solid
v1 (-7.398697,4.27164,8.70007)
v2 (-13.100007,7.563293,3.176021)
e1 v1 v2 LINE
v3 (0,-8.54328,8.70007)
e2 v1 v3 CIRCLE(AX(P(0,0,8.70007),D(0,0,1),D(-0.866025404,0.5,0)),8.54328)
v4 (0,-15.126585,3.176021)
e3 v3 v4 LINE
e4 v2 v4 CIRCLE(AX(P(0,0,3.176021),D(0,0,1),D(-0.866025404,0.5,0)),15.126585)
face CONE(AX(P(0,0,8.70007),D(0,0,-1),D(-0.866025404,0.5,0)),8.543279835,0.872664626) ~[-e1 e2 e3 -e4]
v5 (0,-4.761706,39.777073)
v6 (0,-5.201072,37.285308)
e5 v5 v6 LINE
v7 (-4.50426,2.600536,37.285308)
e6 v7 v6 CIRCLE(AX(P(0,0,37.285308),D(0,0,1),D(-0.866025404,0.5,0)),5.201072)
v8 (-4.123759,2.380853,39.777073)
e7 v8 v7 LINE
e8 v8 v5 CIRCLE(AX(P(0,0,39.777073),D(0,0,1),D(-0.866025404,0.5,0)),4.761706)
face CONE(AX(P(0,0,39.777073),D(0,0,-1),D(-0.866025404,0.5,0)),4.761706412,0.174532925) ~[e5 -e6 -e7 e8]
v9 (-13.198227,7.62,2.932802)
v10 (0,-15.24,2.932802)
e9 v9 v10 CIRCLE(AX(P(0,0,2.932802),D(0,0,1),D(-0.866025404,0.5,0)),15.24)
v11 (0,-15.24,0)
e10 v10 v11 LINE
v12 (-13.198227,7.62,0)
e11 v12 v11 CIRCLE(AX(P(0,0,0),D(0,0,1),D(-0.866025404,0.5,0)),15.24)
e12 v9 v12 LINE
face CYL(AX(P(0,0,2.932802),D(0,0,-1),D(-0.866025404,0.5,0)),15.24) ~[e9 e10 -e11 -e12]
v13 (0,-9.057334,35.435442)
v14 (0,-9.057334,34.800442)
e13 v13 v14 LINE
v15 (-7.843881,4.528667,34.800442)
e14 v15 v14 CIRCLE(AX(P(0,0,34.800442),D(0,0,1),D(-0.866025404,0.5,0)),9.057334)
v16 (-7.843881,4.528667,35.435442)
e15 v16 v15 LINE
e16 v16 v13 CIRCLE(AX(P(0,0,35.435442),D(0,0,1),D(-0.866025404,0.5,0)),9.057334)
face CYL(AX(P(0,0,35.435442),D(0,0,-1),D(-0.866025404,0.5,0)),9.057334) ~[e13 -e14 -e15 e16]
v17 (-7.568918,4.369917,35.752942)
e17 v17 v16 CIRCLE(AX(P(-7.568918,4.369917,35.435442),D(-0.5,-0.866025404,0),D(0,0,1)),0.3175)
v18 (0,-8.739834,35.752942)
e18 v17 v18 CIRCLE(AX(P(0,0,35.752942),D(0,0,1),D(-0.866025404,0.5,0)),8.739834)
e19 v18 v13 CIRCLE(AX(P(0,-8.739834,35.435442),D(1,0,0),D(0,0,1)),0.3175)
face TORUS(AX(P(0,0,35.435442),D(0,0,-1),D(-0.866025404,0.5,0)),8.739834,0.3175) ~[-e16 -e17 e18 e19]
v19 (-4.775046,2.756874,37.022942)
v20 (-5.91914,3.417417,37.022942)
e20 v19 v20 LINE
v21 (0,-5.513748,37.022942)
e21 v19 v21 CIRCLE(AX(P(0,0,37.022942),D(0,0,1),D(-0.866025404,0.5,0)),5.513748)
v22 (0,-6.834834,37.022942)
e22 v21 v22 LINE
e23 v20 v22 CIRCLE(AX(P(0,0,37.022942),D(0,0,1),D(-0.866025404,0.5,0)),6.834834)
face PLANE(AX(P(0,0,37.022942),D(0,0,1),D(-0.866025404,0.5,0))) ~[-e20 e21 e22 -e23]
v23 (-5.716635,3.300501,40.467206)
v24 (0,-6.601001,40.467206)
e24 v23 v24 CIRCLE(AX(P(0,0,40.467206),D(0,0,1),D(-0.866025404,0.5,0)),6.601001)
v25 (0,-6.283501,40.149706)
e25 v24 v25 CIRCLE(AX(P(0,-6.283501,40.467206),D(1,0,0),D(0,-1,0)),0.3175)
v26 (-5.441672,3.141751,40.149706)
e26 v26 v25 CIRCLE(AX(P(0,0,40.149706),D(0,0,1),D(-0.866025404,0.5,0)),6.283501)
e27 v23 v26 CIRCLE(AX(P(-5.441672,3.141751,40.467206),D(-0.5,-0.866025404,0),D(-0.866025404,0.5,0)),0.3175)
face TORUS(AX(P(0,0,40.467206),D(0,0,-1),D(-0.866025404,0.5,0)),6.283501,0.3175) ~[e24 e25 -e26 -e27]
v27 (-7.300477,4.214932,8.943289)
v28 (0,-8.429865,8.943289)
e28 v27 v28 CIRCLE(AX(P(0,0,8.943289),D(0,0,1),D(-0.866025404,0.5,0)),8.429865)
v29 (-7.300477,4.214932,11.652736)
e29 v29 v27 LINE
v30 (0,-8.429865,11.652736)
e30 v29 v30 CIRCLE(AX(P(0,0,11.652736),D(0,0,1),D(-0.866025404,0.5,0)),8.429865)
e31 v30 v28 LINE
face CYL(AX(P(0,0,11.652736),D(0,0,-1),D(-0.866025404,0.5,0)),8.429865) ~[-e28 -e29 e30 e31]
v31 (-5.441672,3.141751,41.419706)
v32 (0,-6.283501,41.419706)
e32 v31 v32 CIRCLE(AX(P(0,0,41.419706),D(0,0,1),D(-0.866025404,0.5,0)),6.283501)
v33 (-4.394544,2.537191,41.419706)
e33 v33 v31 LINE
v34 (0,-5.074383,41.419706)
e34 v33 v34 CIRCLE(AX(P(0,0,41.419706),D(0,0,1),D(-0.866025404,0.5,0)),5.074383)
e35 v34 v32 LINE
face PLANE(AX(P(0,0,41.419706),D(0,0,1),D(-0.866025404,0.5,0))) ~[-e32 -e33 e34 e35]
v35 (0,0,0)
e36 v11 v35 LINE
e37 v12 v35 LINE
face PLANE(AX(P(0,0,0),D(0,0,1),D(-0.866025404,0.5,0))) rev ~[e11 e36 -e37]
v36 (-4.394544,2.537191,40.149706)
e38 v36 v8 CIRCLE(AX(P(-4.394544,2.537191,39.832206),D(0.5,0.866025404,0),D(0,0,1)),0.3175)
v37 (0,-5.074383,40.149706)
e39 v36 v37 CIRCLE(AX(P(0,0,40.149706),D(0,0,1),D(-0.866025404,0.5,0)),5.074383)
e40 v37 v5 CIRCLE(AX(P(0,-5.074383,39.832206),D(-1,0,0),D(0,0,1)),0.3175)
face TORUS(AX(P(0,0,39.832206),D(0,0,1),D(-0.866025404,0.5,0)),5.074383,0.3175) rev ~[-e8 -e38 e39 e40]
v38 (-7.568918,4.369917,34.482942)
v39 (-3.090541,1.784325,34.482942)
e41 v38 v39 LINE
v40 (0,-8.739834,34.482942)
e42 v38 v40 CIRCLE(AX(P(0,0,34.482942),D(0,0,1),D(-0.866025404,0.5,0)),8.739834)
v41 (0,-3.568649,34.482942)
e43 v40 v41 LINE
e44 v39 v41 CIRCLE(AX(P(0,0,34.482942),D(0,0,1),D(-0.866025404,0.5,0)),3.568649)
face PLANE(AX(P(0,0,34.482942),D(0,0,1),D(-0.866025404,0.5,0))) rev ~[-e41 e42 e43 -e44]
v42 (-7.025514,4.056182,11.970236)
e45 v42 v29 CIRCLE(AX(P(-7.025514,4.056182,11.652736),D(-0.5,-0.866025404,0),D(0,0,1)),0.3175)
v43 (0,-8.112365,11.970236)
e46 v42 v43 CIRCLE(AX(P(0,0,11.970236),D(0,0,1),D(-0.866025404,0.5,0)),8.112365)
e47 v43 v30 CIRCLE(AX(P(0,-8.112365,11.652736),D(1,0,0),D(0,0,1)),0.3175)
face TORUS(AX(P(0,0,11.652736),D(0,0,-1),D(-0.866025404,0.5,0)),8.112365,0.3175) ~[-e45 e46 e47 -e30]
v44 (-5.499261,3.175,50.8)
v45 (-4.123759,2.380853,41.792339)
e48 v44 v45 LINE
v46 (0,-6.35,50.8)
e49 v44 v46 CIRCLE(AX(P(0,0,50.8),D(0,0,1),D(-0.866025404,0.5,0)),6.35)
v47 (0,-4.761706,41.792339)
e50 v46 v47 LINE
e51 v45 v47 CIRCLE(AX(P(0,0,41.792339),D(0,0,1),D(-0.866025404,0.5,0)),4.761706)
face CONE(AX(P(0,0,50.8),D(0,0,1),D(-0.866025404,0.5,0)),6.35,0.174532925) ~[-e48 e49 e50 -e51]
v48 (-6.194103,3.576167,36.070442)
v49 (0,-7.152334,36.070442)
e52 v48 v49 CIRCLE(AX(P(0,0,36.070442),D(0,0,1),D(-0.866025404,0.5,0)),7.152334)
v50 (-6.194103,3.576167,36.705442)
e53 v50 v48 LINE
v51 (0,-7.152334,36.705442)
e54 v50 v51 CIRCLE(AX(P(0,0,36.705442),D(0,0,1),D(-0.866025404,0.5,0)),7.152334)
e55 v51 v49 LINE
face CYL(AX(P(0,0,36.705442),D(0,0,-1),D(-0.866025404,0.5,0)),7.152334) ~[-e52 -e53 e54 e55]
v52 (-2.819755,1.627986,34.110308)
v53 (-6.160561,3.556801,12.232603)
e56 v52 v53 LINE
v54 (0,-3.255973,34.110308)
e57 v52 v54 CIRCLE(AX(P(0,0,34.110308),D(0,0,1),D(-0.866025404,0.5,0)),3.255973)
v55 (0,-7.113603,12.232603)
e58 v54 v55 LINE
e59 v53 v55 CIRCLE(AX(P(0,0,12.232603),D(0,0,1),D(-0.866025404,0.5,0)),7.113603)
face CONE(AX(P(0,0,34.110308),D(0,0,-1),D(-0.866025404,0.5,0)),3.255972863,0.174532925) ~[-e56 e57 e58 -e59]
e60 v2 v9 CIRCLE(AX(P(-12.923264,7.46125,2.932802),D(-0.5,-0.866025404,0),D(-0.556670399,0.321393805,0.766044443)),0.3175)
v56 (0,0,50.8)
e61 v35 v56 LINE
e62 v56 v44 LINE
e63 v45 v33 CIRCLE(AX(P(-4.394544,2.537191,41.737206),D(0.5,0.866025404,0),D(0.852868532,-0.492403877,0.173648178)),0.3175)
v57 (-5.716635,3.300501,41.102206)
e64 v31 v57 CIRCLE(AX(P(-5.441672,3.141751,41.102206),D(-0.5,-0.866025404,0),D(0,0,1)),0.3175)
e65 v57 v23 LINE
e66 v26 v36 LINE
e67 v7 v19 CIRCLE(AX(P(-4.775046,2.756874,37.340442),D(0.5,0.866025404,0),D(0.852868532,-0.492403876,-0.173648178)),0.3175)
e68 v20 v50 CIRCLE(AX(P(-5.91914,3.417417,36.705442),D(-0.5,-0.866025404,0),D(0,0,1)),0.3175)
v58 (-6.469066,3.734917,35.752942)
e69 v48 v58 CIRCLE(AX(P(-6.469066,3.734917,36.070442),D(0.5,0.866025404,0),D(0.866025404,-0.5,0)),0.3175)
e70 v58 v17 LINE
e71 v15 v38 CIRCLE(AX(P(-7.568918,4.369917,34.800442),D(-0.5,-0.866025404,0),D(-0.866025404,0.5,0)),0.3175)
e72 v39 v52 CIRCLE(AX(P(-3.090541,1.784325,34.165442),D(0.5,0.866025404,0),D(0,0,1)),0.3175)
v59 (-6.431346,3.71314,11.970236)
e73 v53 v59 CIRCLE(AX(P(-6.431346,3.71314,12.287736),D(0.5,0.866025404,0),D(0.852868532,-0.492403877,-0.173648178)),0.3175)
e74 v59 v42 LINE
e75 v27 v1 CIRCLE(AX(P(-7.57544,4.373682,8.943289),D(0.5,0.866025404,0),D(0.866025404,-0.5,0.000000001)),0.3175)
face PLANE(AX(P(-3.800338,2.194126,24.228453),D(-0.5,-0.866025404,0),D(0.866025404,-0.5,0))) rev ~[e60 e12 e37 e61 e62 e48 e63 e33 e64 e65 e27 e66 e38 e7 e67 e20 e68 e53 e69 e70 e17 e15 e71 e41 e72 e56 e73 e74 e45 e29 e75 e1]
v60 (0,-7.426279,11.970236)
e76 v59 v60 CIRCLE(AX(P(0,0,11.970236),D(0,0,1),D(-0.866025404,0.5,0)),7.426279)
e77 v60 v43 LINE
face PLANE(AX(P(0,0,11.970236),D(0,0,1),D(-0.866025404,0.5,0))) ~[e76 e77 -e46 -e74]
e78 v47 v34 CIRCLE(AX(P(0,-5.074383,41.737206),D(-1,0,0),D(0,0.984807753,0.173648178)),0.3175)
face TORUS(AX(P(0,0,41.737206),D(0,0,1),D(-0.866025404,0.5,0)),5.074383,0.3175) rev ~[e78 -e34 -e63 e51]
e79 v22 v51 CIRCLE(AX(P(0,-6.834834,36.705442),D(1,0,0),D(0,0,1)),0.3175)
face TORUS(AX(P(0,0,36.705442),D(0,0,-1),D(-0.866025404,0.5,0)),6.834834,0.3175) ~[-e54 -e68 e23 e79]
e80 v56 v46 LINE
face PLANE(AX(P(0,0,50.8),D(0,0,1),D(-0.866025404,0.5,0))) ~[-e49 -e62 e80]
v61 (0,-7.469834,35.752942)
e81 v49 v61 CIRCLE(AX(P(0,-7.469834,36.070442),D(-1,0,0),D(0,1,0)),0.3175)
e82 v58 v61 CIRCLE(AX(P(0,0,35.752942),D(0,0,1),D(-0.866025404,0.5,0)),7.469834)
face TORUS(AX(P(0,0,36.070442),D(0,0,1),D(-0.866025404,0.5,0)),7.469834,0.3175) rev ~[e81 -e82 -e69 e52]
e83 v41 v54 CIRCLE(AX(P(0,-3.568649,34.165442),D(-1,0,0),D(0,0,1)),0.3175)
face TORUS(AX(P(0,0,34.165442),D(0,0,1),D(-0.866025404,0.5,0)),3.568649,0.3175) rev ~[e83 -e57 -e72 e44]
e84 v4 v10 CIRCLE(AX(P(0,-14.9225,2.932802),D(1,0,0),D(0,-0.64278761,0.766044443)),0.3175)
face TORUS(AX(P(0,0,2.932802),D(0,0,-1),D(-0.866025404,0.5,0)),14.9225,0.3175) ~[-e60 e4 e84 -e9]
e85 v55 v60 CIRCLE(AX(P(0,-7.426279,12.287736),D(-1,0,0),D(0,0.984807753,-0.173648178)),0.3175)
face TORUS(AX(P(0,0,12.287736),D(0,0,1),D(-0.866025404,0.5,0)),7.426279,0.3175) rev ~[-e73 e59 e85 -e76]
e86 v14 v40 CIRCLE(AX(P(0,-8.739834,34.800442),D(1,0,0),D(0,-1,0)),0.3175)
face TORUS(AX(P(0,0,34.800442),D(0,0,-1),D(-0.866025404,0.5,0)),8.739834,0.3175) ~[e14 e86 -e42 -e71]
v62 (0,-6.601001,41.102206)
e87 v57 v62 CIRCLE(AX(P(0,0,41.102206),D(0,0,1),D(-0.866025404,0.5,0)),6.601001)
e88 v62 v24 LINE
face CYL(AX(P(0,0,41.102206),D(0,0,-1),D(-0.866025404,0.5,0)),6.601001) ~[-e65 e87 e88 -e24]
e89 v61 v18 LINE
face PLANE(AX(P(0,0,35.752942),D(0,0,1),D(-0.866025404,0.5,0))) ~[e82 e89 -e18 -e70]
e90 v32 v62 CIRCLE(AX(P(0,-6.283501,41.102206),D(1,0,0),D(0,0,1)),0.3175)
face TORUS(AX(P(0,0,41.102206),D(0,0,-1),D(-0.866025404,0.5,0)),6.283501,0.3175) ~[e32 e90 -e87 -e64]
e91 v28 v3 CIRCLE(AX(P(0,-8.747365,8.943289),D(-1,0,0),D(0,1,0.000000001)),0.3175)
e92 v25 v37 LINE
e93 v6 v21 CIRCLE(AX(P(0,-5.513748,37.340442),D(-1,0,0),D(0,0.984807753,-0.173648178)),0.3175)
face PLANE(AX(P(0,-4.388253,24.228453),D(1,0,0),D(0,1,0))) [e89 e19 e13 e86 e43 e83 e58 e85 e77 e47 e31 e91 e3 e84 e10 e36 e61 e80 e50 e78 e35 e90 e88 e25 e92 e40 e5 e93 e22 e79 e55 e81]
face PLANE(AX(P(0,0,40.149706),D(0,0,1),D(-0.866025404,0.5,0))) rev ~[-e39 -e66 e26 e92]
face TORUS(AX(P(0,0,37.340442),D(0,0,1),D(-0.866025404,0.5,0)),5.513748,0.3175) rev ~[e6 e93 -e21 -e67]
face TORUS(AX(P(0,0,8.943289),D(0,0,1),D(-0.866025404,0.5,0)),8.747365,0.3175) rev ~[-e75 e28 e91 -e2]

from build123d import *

# Parameters (mm, degrees)
F1_ANGLE_BACK = 30
F1_ANGLE      = 120


# Not quite as in the source:
# - a feature of the source that left no trace in its solid (it failed there, or was rolled back) is left out


with BuildPart() as f1:
    # F0 (on Front) → F1 (revolve)
    with BuildSketch(Plane.XZ, mode=Mode.PRIVATE) as f1_sk:
        with BuildLine():
            Line((-15.24, 0), (0, 0))
            Line((0, 0), (0, 50.8))
            Line((0, 50.8), (-6.35, 50.8))
            Line((-6.35, 50.8), (-4.7617064118, 41.792339449))
            ThreePointArc((-4.7617064118, 41.792339449), (-4.8311637627, 41.5331210865), (-5.0743828734, 41.4197061526))
            Line((-5.0743828734, 41.4197061526), (-6.2835011077, 41.4197061526))
            ThreePointArc((-6.2835011077, 41.4197061526), (-6.5080075107, 41.3267125556), (-6.6010011077, 41.1022061526))
            Line((-6.6010011077, 41.1022061526), (-6.6010011077, 40.4672061526))
            ThreePointArc((-6.6010011077, 40.4672061526), (-6.5080075107, 40.2426997495), (-6.2835011077, 40.1497061526))
            Line((-6.2835011077, 40.1497061526), (-5.0743828734, 40.1497061526))
            ThreePointArc((-5.0743828734, 40.1497061526), (-4.8311637627, 40.0362912186), (-4.7617064118, 39.7770728561))
            Line((-4.7617064118, 39.7770728561), (-5.2010717431, 37.2853082403))
            ThreePointArc((-5.2010717431, 37.2853082403), (-5.3096631386, 37.0972224261), (-5.5137482047, 37.0229415367))
            Line((-5.5137482047, 37.0229415367), (-6.8348340718, 37.0229415367))
            ThreePointArc((-6.8348340718, 37.0229415367), (-7.0593404748, 36.9299479398), (-7.1523340718, 36.7054415367))
            Line((-7.1523340718, 36.7054415367), (-7.1523340718, 36.0704415367))
            ThreePointArc((-7.1523340718, 36.0704415367), (-7.2453276688, 35.8459351337), (-7.4698340718, 35.7529415367))
            Line((-7.4698340718, 35.7529415367), (-8.7398340718, 35.7529415367))
            ThreePointArc((-8.7398340718, 35.7529415367), (-8.9643404748, 35.6599479398), (-9.0573340718, 35.4354415367))
            Line((-9.0573340718, 35.4354415367), (-9.0573340718, 34.8004415367))
            ThreePointArc((-9.0573340718, 34.8004415367), (-8.9643404748, 34.5759351337), (-8.7398340718, 34.4829415367))
            Line((-8.7398340718, 34.4829415367), (-3.5686493249, 34.4829415367))
            ThreePointArc((-3.5686493249, 34.4829415367), (-3.3254302142, 34.3695266028), (-3.2559728633, 34.1103082403))
            Line((-3.2559728633, 34.1103082403), (-7.113602572, 12.2326030065))
            ThreePointArc((-7.113602572, 12.2326030065), (-7.2221939675, 12.0445171922), (-7.4262790336, 11.9702363029))
            Line((-7.4262790336, 11.9702363029), (-8.1123649007, 11.9702363029))
            ThreePointArc((-8.1123649007, 11.9702363029), (-8.3368713037, 11.8772427059), (-8.4298649007, 11.6527363029))
            Line((-8.4298649007, 11.6527363029), (-8.4298649007, 8.9432889844))
            ThreePointArc((-8.4298649007, 8.9432889844), (-8.4596121783, 8.8091076862), (-8.5432798346, 8.7000698737))
            Line((-8.5432798346, 8.7000698737), (-15.1265850661, 3.176020882))
            ThreePointArc((-15.1265850661, 3.176020882), (-15.2102527224, 3.0669830694), (-15.24, 2.9328017713))
            Line((-15.24, 2.9328017713), (-15.24, 0))
        make_face()
    revolve(f1_sk.sketch.rotate(Axis((0, 0, 25.4), (0, 0, 1)), -F1_ANGLE_BACK), axis=Axis((0, 0, 25.4), (0, 0, 1)), revolution_arc=F1_ANGLE)


solid = f1.part
